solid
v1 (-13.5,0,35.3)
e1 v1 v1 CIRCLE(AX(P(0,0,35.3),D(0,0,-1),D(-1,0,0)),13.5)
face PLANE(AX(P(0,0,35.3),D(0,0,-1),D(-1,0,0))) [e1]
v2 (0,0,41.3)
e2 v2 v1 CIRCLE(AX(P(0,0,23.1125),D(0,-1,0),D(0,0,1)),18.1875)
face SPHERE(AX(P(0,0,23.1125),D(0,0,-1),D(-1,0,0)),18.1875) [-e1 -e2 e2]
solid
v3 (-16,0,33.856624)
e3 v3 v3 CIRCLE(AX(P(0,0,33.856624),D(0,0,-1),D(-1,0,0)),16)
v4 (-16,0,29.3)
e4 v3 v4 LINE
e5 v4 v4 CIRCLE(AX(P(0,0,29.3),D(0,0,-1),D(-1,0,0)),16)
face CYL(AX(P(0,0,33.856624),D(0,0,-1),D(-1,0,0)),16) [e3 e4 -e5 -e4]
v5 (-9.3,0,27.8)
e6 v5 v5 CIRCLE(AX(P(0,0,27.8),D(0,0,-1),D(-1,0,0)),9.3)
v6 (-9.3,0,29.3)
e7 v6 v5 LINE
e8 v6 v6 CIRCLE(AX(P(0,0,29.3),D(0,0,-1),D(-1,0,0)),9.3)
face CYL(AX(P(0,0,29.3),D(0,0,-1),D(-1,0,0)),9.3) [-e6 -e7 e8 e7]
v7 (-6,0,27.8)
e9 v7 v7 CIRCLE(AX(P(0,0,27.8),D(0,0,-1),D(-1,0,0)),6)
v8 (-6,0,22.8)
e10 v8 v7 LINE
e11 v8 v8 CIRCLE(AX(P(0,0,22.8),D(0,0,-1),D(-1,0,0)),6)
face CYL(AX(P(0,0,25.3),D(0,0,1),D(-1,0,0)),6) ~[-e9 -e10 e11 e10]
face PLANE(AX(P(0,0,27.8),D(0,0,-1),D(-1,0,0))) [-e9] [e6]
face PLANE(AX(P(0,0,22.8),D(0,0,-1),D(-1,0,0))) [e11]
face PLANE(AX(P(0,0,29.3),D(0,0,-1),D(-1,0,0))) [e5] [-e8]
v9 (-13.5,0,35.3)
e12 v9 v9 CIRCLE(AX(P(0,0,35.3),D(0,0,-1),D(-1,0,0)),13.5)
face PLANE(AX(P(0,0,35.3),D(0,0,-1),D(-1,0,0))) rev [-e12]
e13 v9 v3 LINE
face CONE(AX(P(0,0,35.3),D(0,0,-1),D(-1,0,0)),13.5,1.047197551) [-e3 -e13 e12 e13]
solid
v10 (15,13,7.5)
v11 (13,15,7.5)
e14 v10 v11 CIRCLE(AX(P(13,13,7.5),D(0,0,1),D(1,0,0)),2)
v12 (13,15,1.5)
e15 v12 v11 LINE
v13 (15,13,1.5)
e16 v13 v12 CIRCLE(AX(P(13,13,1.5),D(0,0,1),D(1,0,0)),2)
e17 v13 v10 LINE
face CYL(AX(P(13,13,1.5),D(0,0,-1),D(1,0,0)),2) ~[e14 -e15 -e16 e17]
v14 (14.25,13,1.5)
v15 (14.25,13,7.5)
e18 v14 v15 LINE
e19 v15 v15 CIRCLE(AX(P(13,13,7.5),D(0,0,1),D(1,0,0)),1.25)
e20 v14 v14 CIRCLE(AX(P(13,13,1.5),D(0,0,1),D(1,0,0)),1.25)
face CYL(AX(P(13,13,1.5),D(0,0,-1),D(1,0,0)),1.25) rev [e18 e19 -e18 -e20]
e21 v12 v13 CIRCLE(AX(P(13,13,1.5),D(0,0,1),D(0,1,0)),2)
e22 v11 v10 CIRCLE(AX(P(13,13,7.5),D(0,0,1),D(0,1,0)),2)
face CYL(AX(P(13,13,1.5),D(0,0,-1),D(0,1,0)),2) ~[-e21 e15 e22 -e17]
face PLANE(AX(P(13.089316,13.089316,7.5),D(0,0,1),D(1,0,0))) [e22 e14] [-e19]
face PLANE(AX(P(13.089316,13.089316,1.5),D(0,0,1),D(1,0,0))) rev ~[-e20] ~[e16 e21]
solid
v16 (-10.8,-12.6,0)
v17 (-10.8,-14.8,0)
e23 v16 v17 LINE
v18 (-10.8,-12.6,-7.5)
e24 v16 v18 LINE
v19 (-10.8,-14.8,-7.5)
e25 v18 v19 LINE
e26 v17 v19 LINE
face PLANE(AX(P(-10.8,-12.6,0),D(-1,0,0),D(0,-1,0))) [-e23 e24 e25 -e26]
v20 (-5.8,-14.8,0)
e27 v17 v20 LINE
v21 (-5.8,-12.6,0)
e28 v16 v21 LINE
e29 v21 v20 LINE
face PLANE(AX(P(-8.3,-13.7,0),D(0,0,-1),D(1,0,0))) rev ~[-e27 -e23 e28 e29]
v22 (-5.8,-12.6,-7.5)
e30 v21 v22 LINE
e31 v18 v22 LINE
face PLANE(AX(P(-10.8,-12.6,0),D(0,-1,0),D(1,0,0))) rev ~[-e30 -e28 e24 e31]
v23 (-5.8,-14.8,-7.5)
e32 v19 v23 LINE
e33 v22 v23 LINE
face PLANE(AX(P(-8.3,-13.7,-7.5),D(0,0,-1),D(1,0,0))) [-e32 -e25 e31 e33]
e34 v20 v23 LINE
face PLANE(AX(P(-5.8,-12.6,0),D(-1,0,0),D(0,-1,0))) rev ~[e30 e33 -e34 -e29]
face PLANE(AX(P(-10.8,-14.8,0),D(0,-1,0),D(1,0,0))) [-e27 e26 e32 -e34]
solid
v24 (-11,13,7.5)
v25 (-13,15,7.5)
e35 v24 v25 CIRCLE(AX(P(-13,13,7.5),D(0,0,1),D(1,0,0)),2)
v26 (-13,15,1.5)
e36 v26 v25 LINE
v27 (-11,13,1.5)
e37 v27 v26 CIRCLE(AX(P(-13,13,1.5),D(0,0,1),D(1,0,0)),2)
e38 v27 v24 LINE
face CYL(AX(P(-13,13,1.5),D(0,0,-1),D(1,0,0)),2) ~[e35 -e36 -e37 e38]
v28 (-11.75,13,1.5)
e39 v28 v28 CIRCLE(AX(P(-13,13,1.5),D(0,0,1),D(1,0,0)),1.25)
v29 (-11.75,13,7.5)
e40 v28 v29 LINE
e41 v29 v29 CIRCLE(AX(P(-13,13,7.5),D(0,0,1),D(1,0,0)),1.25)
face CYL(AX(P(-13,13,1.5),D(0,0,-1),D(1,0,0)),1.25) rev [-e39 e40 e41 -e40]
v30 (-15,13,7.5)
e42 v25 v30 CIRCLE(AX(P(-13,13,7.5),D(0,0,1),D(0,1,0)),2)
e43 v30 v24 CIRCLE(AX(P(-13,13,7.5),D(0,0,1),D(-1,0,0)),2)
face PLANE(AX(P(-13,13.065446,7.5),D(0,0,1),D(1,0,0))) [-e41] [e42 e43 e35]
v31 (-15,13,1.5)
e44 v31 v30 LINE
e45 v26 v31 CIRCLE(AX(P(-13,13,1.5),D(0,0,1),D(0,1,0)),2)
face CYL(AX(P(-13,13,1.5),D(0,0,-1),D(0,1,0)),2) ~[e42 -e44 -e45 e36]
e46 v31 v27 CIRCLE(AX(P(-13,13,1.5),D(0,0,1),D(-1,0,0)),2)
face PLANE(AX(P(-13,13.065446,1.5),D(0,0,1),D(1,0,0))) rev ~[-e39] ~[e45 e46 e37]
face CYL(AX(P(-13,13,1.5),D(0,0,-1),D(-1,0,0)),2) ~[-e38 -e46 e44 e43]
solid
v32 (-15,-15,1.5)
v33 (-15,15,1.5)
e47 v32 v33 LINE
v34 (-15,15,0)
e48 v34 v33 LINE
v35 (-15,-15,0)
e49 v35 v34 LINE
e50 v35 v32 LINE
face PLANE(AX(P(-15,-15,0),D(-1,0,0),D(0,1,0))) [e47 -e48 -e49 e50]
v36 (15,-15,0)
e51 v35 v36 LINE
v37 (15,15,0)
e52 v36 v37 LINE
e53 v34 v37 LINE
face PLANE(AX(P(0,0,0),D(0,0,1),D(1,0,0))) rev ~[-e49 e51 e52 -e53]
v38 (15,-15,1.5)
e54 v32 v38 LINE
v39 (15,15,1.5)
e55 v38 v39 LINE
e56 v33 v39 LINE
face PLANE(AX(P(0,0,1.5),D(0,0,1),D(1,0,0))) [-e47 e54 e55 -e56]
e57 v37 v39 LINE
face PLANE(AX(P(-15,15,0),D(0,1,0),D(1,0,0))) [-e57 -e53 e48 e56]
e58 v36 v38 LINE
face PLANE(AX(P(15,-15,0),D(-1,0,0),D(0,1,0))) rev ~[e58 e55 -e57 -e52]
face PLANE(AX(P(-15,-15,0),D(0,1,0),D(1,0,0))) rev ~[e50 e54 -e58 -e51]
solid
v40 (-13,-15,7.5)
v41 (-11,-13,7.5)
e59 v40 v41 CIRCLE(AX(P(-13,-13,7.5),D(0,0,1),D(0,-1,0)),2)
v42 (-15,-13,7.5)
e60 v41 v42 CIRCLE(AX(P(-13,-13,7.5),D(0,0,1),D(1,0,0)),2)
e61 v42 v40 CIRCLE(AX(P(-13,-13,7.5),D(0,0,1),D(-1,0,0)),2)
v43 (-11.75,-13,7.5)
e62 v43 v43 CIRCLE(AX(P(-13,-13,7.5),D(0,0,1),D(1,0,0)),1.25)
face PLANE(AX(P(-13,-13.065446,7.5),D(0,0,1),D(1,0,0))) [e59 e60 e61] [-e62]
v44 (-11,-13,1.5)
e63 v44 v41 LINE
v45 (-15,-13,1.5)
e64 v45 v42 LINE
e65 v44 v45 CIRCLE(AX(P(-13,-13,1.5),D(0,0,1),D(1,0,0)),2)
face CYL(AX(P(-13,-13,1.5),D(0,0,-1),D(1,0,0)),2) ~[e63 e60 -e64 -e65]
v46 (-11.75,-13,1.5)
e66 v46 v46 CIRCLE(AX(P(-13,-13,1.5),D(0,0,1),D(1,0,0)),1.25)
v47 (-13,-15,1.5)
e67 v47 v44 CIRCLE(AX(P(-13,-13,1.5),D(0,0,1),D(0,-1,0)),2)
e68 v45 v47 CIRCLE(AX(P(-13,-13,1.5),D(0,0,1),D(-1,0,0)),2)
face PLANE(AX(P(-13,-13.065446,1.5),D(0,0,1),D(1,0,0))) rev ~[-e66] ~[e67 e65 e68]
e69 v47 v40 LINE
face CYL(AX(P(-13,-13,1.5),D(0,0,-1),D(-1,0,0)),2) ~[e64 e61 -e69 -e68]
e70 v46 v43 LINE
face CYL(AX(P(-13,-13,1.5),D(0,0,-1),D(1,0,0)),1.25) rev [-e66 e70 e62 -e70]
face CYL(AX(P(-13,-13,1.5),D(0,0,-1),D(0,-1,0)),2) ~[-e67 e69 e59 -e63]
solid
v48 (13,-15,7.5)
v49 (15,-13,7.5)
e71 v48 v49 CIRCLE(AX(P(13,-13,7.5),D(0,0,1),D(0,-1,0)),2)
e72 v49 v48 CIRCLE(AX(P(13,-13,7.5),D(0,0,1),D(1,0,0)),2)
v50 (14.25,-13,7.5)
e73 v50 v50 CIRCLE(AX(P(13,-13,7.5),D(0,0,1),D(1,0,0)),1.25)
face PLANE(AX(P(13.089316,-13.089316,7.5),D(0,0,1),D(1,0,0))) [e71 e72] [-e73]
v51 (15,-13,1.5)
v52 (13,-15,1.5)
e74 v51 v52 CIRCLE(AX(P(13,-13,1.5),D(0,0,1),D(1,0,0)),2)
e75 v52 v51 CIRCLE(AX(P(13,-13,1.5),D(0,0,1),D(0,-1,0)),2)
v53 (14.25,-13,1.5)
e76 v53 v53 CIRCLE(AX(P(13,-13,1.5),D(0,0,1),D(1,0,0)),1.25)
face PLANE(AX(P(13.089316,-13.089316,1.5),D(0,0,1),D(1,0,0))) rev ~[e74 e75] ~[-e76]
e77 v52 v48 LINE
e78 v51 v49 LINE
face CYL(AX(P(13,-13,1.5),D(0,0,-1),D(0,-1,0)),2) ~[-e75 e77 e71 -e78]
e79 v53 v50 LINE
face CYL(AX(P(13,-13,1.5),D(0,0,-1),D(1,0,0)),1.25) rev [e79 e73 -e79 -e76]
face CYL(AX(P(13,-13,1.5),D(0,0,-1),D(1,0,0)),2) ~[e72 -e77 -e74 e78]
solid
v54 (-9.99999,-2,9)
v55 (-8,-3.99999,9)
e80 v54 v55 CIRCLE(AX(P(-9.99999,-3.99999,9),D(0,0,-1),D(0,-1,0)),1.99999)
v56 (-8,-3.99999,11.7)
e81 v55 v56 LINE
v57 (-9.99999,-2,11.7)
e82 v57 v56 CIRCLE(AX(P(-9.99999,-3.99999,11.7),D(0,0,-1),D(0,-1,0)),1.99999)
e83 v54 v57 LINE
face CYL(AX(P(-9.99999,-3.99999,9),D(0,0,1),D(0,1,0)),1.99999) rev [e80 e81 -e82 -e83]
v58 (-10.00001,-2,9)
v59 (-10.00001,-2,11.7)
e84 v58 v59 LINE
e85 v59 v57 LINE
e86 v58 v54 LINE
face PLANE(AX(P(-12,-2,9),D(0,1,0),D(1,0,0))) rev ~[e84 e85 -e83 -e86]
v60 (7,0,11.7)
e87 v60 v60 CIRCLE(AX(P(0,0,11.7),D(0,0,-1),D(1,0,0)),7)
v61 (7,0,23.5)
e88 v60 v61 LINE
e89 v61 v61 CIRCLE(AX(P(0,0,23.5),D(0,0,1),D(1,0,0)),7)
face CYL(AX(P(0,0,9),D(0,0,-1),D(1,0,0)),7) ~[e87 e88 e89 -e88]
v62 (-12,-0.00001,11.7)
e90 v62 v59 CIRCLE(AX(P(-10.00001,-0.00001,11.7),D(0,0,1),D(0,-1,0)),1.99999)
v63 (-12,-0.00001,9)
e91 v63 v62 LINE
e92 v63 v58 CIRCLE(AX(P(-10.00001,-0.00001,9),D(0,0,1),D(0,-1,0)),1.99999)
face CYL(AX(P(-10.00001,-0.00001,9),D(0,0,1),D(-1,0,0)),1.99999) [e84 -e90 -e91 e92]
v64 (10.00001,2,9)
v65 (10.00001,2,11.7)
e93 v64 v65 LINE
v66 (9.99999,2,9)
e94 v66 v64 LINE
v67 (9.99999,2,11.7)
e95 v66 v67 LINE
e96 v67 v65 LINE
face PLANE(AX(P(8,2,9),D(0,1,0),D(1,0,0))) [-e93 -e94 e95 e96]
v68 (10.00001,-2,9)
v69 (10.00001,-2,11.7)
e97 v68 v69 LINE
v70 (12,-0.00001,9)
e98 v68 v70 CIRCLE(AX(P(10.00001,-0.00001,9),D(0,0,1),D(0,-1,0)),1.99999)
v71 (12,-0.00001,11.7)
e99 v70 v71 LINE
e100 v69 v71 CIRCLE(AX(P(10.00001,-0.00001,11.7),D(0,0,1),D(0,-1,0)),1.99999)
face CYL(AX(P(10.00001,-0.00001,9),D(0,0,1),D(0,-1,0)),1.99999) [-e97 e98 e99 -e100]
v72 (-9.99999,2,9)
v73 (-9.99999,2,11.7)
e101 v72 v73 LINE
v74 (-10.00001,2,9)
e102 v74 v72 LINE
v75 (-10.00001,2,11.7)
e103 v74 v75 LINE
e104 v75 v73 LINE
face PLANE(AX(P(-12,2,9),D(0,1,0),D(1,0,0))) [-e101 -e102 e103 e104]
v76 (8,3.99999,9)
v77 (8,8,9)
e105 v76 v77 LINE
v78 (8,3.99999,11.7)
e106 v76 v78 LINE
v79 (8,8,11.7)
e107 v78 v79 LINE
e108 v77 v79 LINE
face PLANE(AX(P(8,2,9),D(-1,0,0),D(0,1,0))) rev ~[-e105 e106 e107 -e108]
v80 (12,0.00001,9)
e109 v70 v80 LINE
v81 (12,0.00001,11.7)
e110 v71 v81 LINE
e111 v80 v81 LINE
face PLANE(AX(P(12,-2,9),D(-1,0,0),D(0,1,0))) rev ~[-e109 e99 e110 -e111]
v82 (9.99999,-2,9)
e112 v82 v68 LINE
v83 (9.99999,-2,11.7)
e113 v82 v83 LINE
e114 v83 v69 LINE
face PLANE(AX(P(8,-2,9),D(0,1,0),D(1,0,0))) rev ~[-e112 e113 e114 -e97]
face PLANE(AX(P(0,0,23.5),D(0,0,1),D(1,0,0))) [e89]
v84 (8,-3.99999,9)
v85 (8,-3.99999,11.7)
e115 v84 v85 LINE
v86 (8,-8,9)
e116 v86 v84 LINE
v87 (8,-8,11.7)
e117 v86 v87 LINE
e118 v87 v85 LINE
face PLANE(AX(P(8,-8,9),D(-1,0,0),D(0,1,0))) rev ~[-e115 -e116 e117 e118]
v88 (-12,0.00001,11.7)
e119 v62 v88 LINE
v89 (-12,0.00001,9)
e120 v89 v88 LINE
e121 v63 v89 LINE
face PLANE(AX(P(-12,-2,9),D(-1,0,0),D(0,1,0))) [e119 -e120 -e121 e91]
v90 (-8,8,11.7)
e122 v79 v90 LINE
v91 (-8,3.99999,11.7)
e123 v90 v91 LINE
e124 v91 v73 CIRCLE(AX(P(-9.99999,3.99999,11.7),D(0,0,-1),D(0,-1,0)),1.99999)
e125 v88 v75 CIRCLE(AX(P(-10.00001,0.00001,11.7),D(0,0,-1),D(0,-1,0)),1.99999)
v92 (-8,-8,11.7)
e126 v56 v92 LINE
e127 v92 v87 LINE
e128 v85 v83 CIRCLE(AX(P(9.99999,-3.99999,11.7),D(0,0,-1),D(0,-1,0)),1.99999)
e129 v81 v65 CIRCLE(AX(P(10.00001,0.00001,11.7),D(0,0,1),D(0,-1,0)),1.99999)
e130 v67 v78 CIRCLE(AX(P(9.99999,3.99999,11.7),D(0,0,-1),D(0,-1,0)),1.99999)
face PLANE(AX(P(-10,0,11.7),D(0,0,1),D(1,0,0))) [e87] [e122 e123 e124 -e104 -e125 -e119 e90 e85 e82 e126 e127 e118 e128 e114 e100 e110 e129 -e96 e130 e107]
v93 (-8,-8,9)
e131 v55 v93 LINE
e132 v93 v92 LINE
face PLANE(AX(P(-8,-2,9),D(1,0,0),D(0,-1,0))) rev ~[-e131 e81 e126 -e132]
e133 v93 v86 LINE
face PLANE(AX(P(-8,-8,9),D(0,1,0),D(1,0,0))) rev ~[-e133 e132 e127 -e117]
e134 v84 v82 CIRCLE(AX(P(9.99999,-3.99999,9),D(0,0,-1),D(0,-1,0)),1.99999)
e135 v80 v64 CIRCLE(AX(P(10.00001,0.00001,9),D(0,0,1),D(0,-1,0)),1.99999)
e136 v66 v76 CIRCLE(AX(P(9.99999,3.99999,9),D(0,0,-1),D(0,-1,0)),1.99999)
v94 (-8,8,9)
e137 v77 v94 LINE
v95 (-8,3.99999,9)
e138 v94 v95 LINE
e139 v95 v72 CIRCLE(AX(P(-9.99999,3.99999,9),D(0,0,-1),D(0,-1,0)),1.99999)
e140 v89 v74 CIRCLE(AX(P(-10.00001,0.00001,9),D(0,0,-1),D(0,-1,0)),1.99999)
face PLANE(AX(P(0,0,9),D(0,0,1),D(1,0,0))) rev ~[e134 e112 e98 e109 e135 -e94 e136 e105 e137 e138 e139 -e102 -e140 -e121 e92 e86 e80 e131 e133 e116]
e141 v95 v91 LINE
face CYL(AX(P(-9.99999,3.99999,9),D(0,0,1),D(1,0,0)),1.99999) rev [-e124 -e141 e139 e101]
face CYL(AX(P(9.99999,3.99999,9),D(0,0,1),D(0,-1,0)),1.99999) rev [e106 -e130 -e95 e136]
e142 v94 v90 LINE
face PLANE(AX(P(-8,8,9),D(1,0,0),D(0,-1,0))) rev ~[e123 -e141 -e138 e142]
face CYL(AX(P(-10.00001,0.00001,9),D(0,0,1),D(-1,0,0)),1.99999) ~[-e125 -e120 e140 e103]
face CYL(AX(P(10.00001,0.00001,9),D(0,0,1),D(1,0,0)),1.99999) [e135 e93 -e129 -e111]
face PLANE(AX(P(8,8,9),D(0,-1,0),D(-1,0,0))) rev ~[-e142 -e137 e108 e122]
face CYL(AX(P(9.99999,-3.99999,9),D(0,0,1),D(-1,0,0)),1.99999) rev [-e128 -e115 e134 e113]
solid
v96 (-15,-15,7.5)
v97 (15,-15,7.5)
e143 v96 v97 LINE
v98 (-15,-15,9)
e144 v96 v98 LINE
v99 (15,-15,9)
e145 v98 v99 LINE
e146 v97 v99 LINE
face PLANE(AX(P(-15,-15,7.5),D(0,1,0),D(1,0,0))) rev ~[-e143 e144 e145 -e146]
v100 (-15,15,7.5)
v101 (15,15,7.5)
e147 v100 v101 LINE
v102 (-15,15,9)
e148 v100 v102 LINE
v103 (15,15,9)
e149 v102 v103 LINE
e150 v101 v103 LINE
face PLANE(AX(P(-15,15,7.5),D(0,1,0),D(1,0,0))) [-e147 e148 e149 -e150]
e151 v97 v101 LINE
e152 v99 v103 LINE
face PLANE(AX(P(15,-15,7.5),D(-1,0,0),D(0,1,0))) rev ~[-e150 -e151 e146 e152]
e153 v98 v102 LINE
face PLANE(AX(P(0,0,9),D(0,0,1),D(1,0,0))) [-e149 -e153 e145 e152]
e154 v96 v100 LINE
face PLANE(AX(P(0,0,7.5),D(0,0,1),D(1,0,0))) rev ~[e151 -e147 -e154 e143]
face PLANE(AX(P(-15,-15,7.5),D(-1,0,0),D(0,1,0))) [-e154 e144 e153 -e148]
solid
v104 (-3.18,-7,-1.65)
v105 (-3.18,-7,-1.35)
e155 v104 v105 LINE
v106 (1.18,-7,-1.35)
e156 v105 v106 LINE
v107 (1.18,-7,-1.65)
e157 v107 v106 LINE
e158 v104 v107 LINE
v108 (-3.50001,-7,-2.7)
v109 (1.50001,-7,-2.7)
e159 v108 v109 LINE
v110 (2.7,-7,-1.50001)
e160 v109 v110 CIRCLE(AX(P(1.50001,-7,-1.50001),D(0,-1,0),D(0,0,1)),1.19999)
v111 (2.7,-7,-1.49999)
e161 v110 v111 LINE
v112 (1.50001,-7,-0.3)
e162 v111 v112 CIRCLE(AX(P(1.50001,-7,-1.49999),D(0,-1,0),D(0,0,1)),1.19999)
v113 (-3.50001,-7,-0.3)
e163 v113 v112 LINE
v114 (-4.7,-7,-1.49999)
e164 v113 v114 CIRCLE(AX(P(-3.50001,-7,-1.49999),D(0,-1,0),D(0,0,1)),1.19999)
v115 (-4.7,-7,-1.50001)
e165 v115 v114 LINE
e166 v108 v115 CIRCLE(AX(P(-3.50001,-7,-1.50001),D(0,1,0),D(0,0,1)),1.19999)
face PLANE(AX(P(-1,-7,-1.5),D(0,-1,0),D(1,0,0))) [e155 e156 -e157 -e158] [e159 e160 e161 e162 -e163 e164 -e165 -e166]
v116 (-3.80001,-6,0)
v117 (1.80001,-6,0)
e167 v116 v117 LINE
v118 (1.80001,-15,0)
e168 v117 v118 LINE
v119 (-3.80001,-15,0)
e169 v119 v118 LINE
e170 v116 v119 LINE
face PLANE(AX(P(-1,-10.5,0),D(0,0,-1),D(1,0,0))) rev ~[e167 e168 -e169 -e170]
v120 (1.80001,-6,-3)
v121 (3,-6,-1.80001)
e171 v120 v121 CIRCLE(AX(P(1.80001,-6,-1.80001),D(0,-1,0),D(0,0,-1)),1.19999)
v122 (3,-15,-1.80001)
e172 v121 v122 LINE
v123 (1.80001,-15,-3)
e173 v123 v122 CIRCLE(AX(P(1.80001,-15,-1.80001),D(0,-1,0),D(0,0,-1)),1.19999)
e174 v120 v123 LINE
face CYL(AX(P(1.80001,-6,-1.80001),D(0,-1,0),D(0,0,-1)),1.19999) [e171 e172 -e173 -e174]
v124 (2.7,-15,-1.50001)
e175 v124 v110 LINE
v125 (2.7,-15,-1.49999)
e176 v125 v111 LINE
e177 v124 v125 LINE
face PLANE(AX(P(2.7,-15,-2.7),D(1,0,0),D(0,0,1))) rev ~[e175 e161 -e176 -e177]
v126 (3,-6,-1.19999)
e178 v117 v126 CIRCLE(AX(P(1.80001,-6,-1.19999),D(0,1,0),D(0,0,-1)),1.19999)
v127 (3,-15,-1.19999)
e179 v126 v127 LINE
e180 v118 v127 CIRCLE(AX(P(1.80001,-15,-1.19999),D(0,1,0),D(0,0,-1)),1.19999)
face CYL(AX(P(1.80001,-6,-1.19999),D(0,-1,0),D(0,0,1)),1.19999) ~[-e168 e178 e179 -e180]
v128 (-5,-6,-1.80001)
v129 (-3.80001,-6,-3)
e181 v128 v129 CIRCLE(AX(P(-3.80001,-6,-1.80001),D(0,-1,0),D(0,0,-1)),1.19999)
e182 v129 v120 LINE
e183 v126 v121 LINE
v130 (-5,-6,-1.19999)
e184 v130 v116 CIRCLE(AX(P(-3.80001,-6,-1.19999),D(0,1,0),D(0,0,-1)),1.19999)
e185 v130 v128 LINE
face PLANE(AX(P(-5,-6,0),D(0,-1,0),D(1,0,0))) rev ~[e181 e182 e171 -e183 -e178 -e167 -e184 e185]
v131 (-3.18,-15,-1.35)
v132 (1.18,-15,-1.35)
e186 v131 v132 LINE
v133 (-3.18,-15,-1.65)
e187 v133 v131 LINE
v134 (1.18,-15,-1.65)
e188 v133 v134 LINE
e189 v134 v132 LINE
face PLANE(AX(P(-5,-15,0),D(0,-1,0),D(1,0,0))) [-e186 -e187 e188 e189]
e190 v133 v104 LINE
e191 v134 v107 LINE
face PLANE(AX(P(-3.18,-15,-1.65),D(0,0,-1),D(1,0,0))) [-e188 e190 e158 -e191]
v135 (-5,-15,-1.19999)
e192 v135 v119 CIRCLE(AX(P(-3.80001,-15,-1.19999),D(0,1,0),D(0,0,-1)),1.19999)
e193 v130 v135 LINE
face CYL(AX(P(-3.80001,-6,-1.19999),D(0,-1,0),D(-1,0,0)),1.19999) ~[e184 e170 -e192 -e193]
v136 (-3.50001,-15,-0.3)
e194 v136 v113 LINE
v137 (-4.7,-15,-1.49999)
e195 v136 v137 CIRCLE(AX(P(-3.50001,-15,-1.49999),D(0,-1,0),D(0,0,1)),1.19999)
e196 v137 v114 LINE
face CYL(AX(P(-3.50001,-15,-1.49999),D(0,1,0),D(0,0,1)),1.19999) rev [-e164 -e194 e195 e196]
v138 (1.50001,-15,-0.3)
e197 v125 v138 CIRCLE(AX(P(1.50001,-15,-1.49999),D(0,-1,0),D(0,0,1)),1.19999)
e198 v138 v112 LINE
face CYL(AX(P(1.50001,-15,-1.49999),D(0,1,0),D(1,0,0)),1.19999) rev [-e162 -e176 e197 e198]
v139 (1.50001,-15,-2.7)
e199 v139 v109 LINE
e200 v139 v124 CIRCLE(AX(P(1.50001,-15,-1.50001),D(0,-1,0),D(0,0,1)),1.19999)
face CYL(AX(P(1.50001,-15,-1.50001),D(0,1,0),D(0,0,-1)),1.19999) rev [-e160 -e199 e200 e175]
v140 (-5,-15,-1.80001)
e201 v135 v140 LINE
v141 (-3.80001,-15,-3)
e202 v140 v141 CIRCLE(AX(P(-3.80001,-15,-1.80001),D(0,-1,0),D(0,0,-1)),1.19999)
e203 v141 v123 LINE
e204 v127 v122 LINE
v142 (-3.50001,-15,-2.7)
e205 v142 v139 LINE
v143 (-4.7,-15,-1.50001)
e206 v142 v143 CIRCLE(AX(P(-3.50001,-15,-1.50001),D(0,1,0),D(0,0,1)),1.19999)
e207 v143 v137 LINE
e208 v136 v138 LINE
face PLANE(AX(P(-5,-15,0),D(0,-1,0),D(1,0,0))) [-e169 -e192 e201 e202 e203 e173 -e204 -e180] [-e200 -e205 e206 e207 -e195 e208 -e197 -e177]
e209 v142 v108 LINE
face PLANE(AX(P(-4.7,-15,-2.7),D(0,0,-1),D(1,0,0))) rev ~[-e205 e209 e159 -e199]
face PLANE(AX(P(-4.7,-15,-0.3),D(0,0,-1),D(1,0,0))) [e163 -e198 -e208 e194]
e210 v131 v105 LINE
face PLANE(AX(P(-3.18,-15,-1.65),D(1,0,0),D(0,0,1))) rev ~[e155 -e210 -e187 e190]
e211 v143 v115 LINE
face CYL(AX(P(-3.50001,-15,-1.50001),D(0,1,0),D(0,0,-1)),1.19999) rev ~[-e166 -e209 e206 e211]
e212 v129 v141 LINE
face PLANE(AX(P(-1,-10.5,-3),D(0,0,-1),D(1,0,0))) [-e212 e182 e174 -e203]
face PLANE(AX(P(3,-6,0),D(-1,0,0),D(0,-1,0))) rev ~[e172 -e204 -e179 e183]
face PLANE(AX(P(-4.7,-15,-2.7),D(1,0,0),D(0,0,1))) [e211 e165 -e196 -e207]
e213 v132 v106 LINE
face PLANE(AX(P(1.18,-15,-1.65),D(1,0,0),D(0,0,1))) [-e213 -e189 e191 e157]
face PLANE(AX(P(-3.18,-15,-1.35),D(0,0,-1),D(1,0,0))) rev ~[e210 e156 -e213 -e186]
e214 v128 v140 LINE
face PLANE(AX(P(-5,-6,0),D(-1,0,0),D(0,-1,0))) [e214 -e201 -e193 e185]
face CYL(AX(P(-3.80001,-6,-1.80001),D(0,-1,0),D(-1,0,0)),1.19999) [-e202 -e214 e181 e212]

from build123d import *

# Parameters (mm, degrees)
F0_W      = 30
F0_H      = 30
F1_DEPTH  = 1.5
F2_START  = 6
F1_FACE_W = 30
F1_FACE_H = 30
F2_DEPTH  = 1.5
F3_R      = 1.25
F4_DEPTH  = 6
F5_W      = 4
F5_H      = 4
F5_R      = 7
F6_DEPTH  = 2.7
F7_R      = 1.99999
F8_DEPTH  = 14.5
F9_W      = 6
F9_H      = 5
F12_W     = 8
F12_H     = 9
F13_DEPTH = 3
F14_W     = 7.4
F14_H     = 2.4
F14_W_2   = 4.36
F14_H_2   = 0.3
F15_DEPTH = 8
F16_R     = 1.19999
F17_W     = 5
F17_H     = 2.2
F18_DEPTH = 7.5


# Not quite as in the source:
# - a fillet or chamfer is up to 0.001 mm smaller than in the source, because OpenCascade refuses the exact size


with BuildPart() as f1:
    # F0 (on Top) → F1 (new body)
    with BuildSketch(Plane.XY):
        Rectangle(F0_W, F0_H)
    extrude(amount=F1_DEPTH)


with BuildPart() as f2:
    # F1_face (on face) → F2 (new body)
    with BuildSketch(Plane.XY.offset(1.5).offset(F2_START)):
        Rectangle(F1_FACE_W, F1_FACE_H)
    extrude(amount=F2_DEPTH)


with BuildPart() as f4:
    # F3 (on face) → F4 (new body)
    with BuildSketch(Plane.XY.offset(1.5)):
        with BuildLine():
            ThreePointArc((-11, 13), (-11.5857864376, 14.4142135624), (-13, 15))
            ThreePointArc((-13, 15), (-14.4142135624, 14.4142135624), (-15, 13))
            ThreePointArc((-15, 13), (-13, 11), (-11, 13))
        make_face()
        with Locations((-13, 13)):
            Circle(F3_R, mode=Mode.SUBTRACT)
    extrude(amount=F4_DEPTH)


with BuildPart() as f4b:
    # F3 (on face) → F4, piece 2 (new body)
    with BuildSketch(Plane.XY.offset(1.5)):
        with BuildLine():
            ThreePointArc((-15, -13), (-14.4142135624, -14.4142135624), (-13, -15))
            ThreePointArc((-13, -15), (-11.5857864376, -14.4142135624), (-11, -13))
            ThreePointArc((-11, -13), (-13, -11), (-15, -13))
        make_face()
        with Locations((-13, -13)):
            Circle(F3_R, mode=Mode.SUBTRACT)
    extrude(amount=F4_DEPTH)


with BuildPart() as f4c:
    # F3 (on face) → F4, piece 3 (new body)
    with BuildSketch(Plane.XY.offset(1.5)):
        with BuildLine():
            ThreePointArc((13, -15), (14.4142135624, -14.4142135624), (15, -13))
            ThreePointArc((15, -13), (11.5857864376, -11.5857864376), (13, -15))
        make_face()
        with Locations((13, -13)):
            Circle(F3_R, mode=Mode.SUBTRACT)
    extrude(amount=F4_DEPTH)


with BuildPart() as f4d:
    # F3 (on face) → F4, piece 4 (new body)
    with BuildSketch(Plane.XY.offset(1.5)):
        with BuildLine():
            ThreePointArc((13, 15), (11.5857864376, 11.5857864376), (15, 13))
            ThreePointArc((15, 13), (14.4142135624, 14.4142135624), (13, 15))
        make_face()
        with Locations((13, 13)):
            Circle(F3_R, mode=Mode.SUBTRACT)
    extrude(amount=F4_DEPTH)


with BuildPart() as f6:
    # F5 (on face) → F6 (new body)
    with BuildSketch(Plane.XY.offset(9)):
        with Locations((-10, 0)):
            Rectangle(F5_W, F5_H)
        Polygon((-8, -8), (8, -8), (8, -2), (8, 2), (8, 8), (-8, 8), (-8, 2), (-8, -2), align=None)
        Circle(F5_R, mode=Mode.SUBTRACT)
        with Locations((10, 0)):
            Rectangle(F5_W, F5_H)
        Circle(F5_R)
    extrude(amount=F6_DEPTH)

    # F7 (radius 2 in the source; OpenCascade refuses exactly that, so slightly less here)
    f7_edges = [f6.edges().sort_by_distance(p)[0] for p in [
        (-12, 2, 10.35),
        (-12, -2, 10.35),
        (-8, 2, 10.35),
        (-8, -2, 10.35),
        (12, -2, 10.35),
        (8, -2, 10.35),
        (8, 2, 10.35),
        (12, 2, 10.35),
    ]]
    fillet(f7_edges, radius=F7_R)

    # F5 (on face) → F8 (join)
    with BuildSketch(Plane.XY.offset(9)):
        Circle(F5_R)
    extrude(amount=F8_DEPTH)


with BuildPart() as f10:
    # F9 (on Front) → F10 (revolve)
    with BuildSketch(Plane.XZ):
        with BuildLine():
            Line((-13.5, 35.3), (0, 35.3))
            Line((0, 35.3), (0, 41.3))
            ThreePointArc((0, 41.3), (-7.3866433513, 39.7324475405), (-13.5, 35.3))
        make_face()
    revolve(axis=Axis((0, 0, 25.3), (0, 0, -1)))


with BuildPart() as f11:
    # F9 (on Front) → F11 (revolve)
    with BuildSketch(Plane.XZ):
        Polygon((-9.3, 29.3), (0, 29.3), (0, 35.3), (-13.5, 35.3), (-16, 33.856624327), (-16, 29.3), align=None)
        Polygon((-6, 27.8), (0, 27.8), (0, 29.3), (-9.3, 29.3), (-9.3, 27.8), align=None)
        with Locations((-3, 25.3)):
            Rectangle(F9_W, F9_H)
    revolve(axis=Axis((0, 0, 25.3), (0, 0, -1)))


with BuildPart() as f13:
    # F12 (on face) → F13 (new body)
    with BuildSketch(Plane(origin=(0, 0, 0), x_dir=(1, 0, 0), z_dir=(0, 0, -1))):
        with Locations((-1, 10.5)):
            Rectangle(F12_W, F12_H)
    extrude(amount=F13_DEPTH)

    # F14 (on face) → F15 (cut)
    with BuildSketch(Plane.XZ.offset(15)):
        with Locations((-1, -1.5)):
            Rectangle(F14_W, F14_H)
        with Locations((-1, -1.5)):
            Rectangle(F14_W_2, F14_H_2, mode=Mode.SUBTRACT)
    extrude(amount=-F15_DEPTH, mode=Mode.SUBTRACT)

    # F16 (radius 1.2 in the source; OpenCascade refuses exactly that, so slightly less here)
    f16_edges = [f13.edges().sort_by_distance(p)[0] for p in [
        (-5, -10.5, -3),
        (-5, -10.5, 0),
        (3, -10.5, 0),
        (3, -10.5, -3),
        (-4.7, -11, -0.3),
        (2.7, -11, -0.3),
        (2.7, -11, -2.7),
        (-4.7, -11, -2.7),
    ]]
    fillet(f16_edges, radius=F16_R)


with BuildPart() as f18:
    # F17 (on face) → F18 (new body)
    with BuildSketch(Plane(origin=(0, 0, 0), x_dir=(1, 0, 0), z_dir=(0, 0, -1))):
        with Locations((-8.3, 13.7)):
            Rectangle(F17_W, F17_H)
    extrude(amount=F18_DEPTH)


solid = Compound([f1.part, f2.part, f4.part, f4b.part, f4c.part, f4d.part, f6.part, f10.part, f11.part, f13.part, f18.part])
